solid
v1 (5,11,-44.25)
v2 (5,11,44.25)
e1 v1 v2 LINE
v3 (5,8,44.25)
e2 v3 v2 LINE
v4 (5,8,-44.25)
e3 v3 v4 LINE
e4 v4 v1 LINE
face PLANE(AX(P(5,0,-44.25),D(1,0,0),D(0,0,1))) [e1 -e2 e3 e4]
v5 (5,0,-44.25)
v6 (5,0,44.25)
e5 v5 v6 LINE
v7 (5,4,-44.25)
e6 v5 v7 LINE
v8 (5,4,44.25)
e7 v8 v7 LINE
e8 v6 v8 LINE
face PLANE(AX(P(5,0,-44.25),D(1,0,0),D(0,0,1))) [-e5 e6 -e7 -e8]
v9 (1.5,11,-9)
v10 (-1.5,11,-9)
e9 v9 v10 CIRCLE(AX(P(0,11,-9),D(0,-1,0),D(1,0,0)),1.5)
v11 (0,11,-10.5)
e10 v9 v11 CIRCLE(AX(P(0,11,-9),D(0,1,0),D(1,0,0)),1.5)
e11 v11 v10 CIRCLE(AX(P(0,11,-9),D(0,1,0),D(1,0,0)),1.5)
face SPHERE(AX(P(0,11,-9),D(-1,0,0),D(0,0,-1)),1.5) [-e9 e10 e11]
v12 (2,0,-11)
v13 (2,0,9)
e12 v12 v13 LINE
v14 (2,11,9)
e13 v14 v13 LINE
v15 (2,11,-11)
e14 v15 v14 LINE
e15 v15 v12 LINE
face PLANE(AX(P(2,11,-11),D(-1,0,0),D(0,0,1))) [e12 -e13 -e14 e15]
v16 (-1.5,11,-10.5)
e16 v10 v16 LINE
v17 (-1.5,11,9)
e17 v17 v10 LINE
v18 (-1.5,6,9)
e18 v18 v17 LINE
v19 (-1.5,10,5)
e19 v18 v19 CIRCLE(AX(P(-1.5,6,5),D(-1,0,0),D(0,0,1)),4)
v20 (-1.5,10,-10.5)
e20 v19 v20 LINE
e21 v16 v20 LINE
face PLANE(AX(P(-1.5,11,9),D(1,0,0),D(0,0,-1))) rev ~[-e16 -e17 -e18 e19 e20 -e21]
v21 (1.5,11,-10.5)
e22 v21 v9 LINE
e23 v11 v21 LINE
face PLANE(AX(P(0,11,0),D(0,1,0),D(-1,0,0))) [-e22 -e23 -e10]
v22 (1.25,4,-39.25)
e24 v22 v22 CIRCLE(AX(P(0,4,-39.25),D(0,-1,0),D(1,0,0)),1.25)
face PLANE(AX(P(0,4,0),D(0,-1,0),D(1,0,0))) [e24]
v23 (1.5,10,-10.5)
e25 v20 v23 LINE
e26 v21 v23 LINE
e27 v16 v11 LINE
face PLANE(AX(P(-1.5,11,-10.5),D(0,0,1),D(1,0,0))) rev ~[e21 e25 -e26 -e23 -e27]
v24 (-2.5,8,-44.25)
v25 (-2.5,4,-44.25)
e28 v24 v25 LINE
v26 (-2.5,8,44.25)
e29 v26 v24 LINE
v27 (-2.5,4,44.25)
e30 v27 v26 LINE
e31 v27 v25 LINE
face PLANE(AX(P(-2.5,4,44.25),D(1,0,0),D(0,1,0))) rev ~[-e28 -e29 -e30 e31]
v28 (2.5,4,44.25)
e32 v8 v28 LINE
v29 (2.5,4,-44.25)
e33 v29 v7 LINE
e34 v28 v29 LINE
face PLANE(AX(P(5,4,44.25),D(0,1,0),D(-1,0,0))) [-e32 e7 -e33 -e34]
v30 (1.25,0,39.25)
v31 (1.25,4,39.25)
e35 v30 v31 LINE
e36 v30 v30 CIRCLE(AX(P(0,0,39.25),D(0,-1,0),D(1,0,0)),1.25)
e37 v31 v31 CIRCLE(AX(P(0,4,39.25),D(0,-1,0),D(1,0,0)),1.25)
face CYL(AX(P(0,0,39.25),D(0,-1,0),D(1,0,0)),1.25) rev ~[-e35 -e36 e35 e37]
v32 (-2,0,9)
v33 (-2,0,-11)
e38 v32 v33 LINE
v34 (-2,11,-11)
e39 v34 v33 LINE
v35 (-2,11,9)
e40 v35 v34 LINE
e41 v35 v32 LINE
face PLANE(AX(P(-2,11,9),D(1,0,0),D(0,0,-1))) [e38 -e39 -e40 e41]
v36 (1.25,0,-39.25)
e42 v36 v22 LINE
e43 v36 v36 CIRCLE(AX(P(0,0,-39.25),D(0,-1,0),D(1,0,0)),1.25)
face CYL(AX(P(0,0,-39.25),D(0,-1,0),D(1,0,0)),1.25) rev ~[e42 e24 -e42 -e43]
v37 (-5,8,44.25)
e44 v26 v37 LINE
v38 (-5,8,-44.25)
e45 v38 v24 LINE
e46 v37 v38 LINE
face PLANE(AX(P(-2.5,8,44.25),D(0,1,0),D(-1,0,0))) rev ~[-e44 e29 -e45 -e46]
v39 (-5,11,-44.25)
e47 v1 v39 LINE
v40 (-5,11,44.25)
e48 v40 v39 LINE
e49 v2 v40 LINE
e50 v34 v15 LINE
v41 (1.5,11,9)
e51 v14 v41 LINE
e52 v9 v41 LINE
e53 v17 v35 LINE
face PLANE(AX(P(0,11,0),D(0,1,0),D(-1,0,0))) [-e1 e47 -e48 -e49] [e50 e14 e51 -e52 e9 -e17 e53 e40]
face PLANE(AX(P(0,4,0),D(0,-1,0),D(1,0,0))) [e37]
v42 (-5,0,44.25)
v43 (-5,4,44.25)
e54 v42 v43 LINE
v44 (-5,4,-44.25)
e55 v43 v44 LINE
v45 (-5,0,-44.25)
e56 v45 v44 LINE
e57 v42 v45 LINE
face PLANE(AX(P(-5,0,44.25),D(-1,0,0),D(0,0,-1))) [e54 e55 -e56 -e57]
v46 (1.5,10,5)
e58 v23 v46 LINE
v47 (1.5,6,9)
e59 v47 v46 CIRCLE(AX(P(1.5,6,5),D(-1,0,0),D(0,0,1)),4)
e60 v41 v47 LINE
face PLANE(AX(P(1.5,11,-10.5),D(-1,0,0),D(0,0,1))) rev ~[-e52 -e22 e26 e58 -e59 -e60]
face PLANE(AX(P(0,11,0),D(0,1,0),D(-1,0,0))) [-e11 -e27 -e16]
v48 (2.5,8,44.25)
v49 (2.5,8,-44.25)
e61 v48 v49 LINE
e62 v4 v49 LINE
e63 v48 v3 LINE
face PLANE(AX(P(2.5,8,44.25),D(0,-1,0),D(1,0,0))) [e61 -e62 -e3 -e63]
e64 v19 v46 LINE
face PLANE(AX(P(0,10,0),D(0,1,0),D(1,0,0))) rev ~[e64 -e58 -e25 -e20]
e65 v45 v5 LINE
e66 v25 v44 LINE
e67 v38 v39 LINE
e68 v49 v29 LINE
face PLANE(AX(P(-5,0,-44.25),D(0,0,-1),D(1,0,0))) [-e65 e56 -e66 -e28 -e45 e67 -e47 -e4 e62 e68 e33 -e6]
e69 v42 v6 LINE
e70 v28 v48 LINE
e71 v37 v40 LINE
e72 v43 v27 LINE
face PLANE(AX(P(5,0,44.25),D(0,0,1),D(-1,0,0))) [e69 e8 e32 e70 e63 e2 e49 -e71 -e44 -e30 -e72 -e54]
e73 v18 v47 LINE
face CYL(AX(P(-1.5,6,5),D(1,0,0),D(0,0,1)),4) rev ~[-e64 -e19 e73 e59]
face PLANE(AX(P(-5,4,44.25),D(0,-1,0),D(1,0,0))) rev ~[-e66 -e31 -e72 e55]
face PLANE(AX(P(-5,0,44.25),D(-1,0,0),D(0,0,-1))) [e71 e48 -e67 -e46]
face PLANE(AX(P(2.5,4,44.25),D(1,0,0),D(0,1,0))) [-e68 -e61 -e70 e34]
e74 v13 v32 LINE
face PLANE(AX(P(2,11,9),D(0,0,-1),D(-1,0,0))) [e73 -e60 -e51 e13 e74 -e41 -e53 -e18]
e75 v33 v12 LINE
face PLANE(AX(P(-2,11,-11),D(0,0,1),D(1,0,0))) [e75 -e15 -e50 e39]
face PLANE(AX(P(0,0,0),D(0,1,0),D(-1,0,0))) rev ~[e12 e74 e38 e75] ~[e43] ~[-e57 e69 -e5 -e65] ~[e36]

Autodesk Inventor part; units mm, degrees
ref_plane "YZ Plane" through (0, 0, 0) normal (1, 0, 0) x (0, 1, 0)
ref_plane "XZ Plane" through (0, 0, 0) normal (0, 1, 0) x (-1, 0, 0)
ref_plane "XY Plane" through (0, 0, 0) normal (0, 0, 1) x (1, 0, 0)
sketch "Sketch1" plane through (0, 0, 0) normal (0, 1, 0) x (-1, 0, 0)
  line L0 (-5, 44.25) -> (5, 44.25)
  line L1 (5, 44.25) -> (5, -44.25)
  line L2 (5, -44.25) -> (-5, -44.25)
  line L3 (-5, -44.25) -> (-5, 44.25)
  line L4 (-5, 44.25) -> (5, -44.25) construction
  line L5 (5, 44.25) -> (-5, -44.25) construction
  point P0 (0, 0)
  dimension "d0" = 88.5
  dimension "d1" = 10
extrude "Extrusion1" add sketch "Sketch1" along normal blind 11
sketch "Sketch2" plane through (-5, 0, 44.25) normal (0, 0, 1) x (1, 0, 0)
  line L0 (10, 0) -> (0, 0) projected
  line L1 (5, 0) -> (0, 0)
  line L2 (0, 0) -> (0, 4)
  line L3 (0, 4) -> (2.5, 4)
  line L4 (2.5, 4) -> (2.5, 8)
  line L5 (2.5, 8) -> (0, 8)
  line L6 (0, 8) -> (0, 11)
  line L7 (0, 11) -> (5, 11)
  line L8 (0, 11) -> (10, 11) projected
  line L9 (5, 11) -> (5, 0) construction
  line L10 (0, 0) -> (10, 0)
  line L11 (10, 0) -> (10, 4)
  line L12 (10, 4) -> (7.5, 4)
  line L13 (7.5, 4) -> (7.5, 8)
  line L14 (7.5, 8) -> (10, 8)
  line L15 (10, 8) -> (10, 11)
  line L16 (10, 11) -> (5, 11)
  dimension "d4" = 3
  dimension "d5" = 4
  dimension "d6" = 2.5
extrude "Extrusion2" cut sketch "Sketch2" against normal through all keep common part
sketch "Sketch3" plane through (0, 0, 0) normal (0, -1, 0) x (1, 0, 0)
  line L0 (0, 0) -> (0, 39.25) construction
  circle A0 centre (0, 39.25) radius 1.25
  line L1 (5, -44.25) -> (5, 44.25) construction
  line L2 (5, 0) -> (-5, 0) construction
  line L3 (-5, 44.25) -> (-5, -44.25) construction
  circle A1 centre (0, -39.25) radius 1.25
  dimension "d9" = 2.5
  dimension "d10" = 39.25
extrude "Extrusion3" cut sketch "Sketch3" against normal blind 4
sketch "Sketch4" plane through (0, 11, 0) normal (0, 1, 0) x (1, 0, 0)
  line L0 (-2, 11) -> (2, 11)
  line L1 (2, 11) -> (2, -9)
  line L2 (2, -9) -> (-2, -9)
  line L3 (-2, -9) -> (-2, 11)
  line L4 (-2, 11) -> (2, -9) construction
  line L5 (2, 11) -> (-2, -9) construction
  line L6 (0, 1) -> (0, 0) construction
  dimension "d13" = 4
  dimension "d14" = 20
  dimension "d15" = 1
extrude "Extrusion4" cut sketch "Sketch4" against normal through all
sketch "Sketch5" plane through (0, 11, 0) normal (0, 1, 0) x (1, 0, 0)
  line L0 (-2, -9) -> (-2, 11) projected
  line L1 (-2, 11) -> (2, 11) projected
  line L2 (2, 11) -> (2, -9) projected
  line L3 (-1.5, -9) -> (-1.5, 10.5)
  line L4 (-1.5, 10.5) -> (1.5, 10.5)
  line L5 (1.5, 10.5) -> (1.5, -9)
  line L6 (-1.5, -9) -> (1.5, -9)
  line L7 (2, -9) -> (-2, -9) projected
  point P0 (0, 0)
  dimension "d18" = 0.5
extrude "Extrusion5" add sketch "Sketch5" against normal blind 1 contours L3 L4 L5 L6
fillet "Fillet1" radius 4 1 edges at (0, 10, 9)
sketch "Sketch7" plane through (0, 11, 0) normal (0, 1, 0) x (1, 0, 0)
  line L0 (1.5, 10.5) -> (-1.5, 10.5) construction
  line L1 (-1.5, 10.5) -> (1.5, 10.5) construction
  line L2 (1.5, 10.5) -> (1.5, 7.5) construction
  line L3 (1.5, 7.5) -> (-1.5, 7.5) construction
  line L4 (-1.5, 7.5) -> (-1.5, 10.5) construction
  line L5 (1.5, -9) -> (1.5, 10.5) projected
  line L6 (-1.5, 10.5) -> (1.5, 7.5) construction
  circle A0 centre (0, 9) radius 1.5
  line L7 (0, 9) -> (1.5, 9)
  line L8 (0, 9) -> (-1.5, 9)
  point P0 (0, 0)
  dimension "d24" = 3
  dimension "d25" = 3
revolve "Revolution1" add sketch "Sketch7" angle 180 about axis through (0, 11, -9) along (1, 0, 0) picked at (0.9282, 9.352) contours L7 L8 A0
properties part number "Screen Docking rail"
